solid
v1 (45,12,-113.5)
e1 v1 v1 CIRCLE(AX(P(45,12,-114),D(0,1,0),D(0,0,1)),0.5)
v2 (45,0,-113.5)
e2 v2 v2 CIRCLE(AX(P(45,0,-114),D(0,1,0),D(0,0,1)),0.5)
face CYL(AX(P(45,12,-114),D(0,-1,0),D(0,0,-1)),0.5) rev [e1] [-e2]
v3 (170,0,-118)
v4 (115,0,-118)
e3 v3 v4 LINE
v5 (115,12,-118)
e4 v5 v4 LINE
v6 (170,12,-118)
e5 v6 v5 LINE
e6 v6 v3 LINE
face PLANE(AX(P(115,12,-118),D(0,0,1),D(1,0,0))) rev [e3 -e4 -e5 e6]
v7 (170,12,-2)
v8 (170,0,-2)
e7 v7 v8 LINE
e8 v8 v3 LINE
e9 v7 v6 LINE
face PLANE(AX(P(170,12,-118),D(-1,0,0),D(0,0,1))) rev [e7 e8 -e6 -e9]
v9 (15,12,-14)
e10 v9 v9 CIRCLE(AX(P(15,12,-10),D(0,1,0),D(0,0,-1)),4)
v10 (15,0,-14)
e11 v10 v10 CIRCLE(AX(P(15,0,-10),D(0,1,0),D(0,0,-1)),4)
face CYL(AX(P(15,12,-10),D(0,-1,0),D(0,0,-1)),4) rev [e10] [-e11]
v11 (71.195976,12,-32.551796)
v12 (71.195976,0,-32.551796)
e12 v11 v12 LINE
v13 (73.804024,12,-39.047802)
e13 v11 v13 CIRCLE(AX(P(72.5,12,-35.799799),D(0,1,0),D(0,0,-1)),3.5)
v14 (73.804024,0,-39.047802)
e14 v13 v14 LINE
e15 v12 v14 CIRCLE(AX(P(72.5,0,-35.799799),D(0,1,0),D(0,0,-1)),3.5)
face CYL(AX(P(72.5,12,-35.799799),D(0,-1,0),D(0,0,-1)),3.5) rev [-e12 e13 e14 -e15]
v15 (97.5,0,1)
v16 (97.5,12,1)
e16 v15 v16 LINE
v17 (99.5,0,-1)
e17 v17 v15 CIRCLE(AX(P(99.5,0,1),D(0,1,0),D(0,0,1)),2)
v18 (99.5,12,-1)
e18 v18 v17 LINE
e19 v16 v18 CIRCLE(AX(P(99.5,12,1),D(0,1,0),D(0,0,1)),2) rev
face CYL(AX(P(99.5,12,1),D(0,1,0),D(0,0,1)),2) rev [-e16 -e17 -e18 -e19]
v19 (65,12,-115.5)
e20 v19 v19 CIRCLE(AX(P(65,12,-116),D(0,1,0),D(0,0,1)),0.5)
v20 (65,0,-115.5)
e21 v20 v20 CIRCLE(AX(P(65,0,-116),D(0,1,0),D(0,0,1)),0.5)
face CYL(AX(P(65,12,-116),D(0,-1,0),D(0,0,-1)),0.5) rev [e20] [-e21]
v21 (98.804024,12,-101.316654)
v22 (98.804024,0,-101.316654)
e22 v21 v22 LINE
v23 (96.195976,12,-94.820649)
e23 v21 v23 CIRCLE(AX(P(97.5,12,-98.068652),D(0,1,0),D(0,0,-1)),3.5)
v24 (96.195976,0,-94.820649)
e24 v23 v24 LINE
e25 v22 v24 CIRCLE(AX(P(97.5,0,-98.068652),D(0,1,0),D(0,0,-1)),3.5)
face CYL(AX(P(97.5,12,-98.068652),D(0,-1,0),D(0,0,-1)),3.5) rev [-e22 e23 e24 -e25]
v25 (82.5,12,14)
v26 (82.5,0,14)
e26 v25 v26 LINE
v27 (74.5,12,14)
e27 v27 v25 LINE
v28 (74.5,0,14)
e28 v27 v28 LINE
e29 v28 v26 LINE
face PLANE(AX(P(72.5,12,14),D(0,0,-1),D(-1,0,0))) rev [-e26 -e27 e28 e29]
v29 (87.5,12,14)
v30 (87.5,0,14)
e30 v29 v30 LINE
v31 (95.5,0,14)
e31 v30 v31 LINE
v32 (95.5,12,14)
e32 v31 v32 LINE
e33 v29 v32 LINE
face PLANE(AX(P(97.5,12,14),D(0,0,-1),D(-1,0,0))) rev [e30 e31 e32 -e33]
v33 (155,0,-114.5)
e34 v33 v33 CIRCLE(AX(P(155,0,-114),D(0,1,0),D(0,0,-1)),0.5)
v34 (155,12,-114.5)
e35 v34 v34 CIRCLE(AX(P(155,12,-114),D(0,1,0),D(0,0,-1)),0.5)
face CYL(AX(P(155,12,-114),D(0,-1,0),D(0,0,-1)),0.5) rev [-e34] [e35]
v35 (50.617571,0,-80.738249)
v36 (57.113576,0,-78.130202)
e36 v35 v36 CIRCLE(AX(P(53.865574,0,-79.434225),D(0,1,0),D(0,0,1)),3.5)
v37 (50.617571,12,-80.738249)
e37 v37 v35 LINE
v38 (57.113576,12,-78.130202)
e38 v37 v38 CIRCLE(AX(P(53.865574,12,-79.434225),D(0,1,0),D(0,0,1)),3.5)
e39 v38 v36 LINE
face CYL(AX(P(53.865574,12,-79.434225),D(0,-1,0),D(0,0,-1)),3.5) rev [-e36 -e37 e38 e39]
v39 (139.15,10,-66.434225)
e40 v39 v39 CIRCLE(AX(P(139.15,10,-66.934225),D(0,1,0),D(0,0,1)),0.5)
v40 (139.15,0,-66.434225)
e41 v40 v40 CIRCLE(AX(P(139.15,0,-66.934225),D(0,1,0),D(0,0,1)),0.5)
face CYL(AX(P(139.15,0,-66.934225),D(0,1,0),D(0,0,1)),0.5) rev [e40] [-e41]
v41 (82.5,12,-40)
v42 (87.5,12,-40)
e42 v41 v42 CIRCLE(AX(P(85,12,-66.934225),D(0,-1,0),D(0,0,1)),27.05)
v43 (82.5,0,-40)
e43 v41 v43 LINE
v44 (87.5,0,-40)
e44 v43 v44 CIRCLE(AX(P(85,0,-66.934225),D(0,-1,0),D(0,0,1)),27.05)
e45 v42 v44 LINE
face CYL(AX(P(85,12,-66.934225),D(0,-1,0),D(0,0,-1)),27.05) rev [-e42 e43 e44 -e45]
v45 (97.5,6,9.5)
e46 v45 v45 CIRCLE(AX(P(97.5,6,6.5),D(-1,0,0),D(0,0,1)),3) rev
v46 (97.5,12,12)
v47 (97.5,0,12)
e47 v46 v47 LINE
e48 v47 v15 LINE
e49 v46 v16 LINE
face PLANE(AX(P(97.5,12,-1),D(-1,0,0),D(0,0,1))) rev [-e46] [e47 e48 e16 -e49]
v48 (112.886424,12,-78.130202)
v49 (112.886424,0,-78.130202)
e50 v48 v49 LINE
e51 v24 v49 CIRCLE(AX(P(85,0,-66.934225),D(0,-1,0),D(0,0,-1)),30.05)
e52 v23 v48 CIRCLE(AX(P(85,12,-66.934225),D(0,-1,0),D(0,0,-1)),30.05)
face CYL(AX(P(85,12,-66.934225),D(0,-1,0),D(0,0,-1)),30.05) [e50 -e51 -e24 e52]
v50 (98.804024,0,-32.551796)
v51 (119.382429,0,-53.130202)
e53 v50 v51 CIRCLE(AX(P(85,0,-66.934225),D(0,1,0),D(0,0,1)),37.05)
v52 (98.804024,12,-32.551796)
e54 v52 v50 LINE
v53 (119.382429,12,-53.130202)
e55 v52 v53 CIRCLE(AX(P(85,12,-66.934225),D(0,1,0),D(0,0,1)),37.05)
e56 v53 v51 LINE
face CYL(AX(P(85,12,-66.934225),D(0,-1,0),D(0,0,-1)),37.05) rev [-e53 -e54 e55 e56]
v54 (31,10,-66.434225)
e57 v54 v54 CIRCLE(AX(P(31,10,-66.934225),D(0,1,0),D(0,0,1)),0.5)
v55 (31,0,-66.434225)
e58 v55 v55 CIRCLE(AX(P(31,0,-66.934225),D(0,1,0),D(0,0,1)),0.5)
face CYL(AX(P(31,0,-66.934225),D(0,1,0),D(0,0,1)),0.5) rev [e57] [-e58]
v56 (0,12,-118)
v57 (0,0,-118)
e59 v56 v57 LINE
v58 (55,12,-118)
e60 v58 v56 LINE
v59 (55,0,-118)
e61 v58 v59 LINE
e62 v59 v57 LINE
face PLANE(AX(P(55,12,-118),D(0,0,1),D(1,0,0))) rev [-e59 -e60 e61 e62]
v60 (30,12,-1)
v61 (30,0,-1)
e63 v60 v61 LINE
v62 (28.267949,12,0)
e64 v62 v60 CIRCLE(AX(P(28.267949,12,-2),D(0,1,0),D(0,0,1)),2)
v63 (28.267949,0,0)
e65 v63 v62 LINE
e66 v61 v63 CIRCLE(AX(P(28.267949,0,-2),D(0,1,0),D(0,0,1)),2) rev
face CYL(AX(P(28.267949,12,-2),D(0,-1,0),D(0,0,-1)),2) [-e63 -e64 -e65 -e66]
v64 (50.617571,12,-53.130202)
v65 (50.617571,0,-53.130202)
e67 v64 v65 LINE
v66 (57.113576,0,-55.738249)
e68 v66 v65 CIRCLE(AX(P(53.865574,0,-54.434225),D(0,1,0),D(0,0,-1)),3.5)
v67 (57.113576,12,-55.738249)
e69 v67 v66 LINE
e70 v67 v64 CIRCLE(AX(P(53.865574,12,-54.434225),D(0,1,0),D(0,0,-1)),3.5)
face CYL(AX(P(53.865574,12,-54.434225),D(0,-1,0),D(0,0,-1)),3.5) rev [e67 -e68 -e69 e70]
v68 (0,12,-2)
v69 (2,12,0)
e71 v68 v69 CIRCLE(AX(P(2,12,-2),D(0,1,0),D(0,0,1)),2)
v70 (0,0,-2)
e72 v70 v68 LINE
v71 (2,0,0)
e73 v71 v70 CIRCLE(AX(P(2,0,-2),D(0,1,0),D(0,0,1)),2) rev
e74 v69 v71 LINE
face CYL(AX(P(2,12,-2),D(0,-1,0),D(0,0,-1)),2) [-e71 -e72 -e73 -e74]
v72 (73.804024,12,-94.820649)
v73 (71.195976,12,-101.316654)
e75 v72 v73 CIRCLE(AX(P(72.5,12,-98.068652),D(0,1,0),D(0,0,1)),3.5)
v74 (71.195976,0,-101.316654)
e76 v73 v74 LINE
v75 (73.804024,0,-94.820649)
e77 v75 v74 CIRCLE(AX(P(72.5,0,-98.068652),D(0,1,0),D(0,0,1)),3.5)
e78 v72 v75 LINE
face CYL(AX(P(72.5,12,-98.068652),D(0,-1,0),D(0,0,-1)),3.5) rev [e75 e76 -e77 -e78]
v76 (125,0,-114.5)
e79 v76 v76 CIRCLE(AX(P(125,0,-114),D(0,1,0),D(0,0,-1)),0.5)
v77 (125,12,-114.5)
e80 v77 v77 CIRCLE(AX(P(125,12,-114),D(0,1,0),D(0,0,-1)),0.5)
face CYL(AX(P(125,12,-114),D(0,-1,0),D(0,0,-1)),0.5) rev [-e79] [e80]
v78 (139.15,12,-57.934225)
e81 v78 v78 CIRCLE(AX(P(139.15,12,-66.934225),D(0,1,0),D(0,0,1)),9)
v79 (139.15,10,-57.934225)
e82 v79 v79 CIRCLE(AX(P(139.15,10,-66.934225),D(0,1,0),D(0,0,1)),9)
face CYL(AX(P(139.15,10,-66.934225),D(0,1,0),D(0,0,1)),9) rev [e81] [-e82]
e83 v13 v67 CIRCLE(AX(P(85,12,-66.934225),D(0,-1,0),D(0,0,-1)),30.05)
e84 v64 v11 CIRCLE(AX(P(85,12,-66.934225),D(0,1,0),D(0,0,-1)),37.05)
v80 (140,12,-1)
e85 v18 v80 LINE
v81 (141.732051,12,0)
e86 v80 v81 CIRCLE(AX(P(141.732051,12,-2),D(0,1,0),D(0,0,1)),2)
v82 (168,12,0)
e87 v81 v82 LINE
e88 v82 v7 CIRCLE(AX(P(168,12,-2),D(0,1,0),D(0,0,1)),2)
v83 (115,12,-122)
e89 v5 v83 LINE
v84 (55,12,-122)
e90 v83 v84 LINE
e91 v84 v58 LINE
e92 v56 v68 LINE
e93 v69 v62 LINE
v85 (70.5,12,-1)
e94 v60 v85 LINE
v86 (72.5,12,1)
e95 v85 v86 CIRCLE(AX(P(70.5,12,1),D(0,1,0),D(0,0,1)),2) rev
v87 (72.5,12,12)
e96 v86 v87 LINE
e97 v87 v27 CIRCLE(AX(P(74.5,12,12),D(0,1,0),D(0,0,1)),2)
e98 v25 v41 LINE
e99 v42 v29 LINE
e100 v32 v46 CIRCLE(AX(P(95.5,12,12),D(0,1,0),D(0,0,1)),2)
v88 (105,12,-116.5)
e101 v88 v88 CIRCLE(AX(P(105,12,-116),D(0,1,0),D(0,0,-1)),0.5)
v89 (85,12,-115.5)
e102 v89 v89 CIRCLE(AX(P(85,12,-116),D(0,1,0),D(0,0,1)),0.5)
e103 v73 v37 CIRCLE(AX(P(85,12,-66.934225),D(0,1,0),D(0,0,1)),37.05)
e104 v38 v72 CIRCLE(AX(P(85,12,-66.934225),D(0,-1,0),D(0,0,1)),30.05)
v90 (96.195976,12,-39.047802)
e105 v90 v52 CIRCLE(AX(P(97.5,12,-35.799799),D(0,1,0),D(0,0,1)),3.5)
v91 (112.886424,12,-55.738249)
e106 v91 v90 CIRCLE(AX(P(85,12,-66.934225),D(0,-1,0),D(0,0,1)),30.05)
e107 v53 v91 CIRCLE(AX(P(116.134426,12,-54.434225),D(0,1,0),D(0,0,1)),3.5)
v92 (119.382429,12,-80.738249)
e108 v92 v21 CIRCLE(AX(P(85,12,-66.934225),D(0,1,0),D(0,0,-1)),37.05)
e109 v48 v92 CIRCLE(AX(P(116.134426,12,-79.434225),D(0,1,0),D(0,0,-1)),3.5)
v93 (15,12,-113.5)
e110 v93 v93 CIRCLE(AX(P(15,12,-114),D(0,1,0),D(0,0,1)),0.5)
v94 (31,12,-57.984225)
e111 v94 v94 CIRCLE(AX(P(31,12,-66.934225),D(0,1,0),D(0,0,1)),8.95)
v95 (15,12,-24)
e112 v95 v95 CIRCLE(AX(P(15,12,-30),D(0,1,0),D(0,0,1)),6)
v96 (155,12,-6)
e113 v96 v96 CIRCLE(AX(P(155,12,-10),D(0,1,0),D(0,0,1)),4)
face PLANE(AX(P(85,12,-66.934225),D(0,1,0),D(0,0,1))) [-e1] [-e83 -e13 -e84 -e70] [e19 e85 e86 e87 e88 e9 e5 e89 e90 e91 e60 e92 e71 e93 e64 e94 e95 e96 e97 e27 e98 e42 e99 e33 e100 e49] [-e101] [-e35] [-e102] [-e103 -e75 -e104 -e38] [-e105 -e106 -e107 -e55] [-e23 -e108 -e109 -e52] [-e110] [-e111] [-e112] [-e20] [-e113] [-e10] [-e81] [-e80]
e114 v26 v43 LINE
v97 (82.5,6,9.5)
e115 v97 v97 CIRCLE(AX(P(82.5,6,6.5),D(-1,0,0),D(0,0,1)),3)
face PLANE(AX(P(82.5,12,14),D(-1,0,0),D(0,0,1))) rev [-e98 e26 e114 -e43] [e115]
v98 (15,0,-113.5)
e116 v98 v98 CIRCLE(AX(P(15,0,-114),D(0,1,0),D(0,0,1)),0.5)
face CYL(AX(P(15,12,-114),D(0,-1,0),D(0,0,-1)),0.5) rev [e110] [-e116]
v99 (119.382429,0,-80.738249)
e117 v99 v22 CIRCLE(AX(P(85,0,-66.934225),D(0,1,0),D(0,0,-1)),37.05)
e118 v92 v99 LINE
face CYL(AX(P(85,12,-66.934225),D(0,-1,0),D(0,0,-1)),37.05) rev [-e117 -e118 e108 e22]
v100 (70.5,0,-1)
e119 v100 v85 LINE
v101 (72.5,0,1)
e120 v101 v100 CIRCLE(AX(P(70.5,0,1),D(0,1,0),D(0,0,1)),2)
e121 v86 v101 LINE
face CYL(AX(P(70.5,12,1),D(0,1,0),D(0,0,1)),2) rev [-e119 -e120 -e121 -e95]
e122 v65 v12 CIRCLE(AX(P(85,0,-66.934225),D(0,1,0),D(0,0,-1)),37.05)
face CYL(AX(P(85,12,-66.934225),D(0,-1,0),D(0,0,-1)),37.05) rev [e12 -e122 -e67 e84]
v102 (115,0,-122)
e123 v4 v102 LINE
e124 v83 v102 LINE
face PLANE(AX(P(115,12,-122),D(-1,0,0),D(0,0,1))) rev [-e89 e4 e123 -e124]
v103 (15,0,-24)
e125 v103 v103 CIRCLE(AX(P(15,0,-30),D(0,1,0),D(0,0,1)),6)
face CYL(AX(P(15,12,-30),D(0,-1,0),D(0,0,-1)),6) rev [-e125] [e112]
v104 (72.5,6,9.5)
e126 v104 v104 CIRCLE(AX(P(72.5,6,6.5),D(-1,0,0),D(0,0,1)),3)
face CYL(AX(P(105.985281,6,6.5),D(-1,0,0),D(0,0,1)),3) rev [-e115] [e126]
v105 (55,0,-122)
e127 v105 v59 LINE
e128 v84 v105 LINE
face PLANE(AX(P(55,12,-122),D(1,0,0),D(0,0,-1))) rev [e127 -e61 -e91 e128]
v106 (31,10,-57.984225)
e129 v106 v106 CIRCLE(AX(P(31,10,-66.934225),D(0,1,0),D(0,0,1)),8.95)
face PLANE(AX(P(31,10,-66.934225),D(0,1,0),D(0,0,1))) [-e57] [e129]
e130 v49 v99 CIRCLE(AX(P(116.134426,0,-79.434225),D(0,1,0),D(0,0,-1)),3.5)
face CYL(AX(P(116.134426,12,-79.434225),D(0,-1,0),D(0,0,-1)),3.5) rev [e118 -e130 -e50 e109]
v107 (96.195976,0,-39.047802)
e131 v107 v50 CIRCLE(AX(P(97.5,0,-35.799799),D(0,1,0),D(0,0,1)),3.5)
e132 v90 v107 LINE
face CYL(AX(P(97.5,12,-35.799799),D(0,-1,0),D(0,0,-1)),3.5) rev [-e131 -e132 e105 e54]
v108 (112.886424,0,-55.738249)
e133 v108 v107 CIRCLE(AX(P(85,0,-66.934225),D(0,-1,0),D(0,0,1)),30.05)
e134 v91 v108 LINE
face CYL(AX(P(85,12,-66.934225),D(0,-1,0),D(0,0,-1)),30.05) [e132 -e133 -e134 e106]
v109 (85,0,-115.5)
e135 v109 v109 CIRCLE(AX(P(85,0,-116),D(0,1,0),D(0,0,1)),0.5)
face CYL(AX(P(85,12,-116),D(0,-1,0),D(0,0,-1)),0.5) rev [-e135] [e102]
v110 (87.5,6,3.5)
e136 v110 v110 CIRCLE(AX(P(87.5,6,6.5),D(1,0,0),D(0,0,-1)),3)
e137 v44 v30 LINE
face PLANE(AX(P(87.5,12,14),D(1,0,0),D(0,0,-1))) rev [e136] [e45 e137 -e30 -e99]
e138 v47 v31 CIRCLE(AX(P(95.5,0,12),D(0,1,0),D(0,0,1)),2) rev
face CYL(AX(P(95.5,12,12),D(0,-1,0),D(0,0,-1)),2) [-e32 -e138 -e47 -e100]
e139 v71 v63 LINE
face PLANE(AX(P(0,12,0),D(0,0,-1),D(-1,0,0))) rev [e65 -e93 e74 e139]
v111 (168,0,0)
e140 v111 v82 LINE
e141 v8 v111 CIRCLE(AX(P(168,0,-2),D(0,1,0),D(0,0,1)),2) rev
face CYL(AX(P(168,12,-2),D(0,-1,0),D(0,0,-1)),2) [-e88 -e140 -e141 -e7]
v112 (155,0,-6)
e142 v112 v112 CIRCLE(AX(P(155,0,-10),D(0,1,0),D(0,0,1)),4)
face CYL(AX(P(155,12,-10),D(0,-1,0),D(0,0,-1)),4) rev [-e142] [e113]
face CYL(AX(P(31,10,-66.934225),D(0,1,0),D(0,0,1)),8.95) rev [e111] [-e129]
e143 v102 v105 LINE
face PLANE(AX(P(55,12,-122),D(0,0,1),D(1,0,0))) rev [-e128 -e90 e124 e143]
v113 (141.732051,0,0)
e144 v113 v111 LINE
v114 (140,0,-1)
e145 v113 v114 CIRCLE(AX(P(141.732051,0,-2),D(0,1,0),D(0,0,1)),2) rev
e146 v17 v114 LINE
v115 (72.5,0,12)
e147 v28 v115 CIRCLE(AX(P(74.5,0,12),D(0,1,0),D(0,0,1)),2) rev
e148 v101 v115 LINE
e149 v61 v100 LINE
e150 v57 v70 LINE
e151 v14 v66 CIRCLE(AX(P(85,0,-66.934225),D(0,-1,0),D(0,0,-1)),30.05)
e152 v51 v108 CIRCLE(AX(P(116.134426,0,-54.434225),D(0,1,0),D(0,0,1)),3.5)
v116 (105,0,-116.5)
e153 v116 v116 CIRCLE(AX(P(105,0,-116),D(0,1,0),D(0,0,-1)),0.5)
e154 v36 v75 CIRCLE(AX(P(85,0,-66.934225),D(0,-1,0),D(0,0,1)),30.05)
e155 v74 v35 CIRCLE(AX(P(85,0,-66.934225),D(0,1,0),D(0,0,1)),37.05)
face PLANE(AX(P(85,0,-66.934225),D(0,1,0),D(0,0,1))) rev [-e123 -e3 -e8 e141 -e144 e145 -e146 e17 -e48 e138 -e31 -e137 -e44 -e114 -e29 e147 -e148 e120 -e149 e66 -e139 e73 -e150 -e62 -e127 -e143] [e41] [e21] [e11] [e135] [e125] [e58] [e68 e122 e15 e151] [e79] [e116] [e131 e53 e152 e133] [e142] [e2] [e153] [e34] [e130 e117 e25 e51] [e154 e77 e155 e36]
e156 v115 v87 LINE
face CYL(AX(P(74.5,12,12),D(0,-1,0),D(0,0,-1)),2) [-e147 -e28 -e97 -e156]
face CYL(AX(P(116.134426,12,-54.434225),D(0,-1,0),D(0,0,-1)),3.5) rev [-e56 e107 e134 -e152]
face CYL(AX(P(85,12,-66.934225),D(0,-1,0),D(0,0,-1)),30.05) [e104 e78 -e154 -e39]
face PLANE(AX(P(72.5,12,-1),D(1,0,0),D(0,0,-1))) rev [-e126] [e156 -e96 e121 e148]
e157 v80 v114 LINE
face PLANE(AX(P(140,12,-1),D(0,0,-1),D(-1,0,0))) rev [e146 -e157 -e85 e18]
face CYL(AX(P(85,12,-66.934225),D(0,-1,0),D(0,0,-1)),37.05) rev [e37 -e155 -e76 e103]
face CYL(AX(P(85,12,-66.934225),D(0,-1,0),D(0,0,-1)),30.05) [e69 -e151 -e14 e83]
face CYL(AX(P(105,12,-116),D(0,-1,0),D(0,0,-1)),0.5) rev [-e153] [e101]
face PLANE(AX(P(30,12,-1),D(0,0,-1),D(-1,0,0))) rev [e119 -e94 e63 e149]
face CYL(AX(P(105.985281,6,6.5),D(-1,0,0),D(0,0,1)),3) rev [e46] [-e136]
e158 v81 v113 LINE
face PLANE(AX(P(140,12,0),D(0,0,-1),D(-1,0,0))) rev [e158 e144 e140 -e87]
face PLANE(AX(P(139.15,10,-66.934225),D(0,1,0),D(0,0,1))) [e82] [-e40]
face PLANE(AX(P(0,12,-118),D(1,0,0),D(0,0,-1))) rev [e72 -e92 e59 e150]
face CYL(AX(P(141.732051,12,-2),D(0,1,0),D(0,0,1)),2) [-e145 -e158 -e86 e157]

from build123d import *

# Parameters (mm, degrees)
SKETCH1_R           = 0.5
SKETCH1_R_2         = 6
SKETCH1_R_3         = 4
BOSS_EXTRUDE1_DEPTH = 12
SKETCH2_R           = 8.95
SKETCH2_R_2         = 9
CUT_EXTRUDE1_DEPTH  = 2
SKETCH3_R           = 0.5
CUT_EXTRUDE2_DEPTH  = 210.485083001
SKETCH4_R           = 3
CUT_EXTRUDE3_DEPTH  = 25
FILLET1_R           = 2


with BuildPart() as part:
    # Sketch1 → Boss-Extrude1 (new body)
    with BuildSketch(Plane(origin=(0, 0, 0), x_dir=(1, 0, 0), z_dir=(0, 1, 0))):
        with BuildLine():
            Line((55, 122), (55, 118))
            Line((55, 118), (0, 118))
            Line((0, 118), (0, 0))
            Line((0, 0), (30, 0))
            Line((30, 0), (30, 1))
            Line((30, 1), (72.5, 1))
            Line((72.5, 1), (72.5, -14))
            Line((72.5, -14), (82.5, -14))
            Line((82.5, -14), (82.5, 40))
            ThreePointArc((82.5, 40), (85, 93.984225439), (87.5, 40))
            Line((87.5, 40), (87.5, -14))
            Line((87.5, -14), (97.5, -14))
            Line((97.5, -14), (97.5, 1))
            Line((97.5, 1), (140, 1))
            Line((140, 1), (140, 0))
            Line((140, 0), (170, 0))
            Line((170, 0), (170, 118))
            Line((170, 118), (115, 118))
            Line((115, 118), (115, 122))
            Line((115, 122), (55, 122))
        make_face()
        with Locations(Location((65, 116, 0), (0, 0, 270))):
            Circle(SKETCH1_R, mode=Mode.SUBTRACT)
        with Locations(Location((105, 116, 0), (0, 0, 90))):
            Circle(SKETCH1_R, mode=Mode.SUBTRACT)
        with Locations(Location((45, 114, 0), (0, 0, 270))):
            Circle(SKETCH1_R, mode=Mode.SUBTRACT)
        with Locations(Location((15, 114, 0), (0, 0, 270))):
            Circle(SKETCH1_R, mode=Mode.SUBTRACT)
        with Locations(Location((155, 114, 0), (0, 0, 90))):
            Circle(SKETCH1_R, mode=Mode.SUBTRACT)
        with Locations(Location((125, 114, 0), (0, 0, 90))):
            Circle(SKETCH1_R, mode=Mode.SUBTRACT)
        with Locations(Location((15, 30, 0), (0, 0, 270))):
            Circle(SKETCH1_R_2, mode=Mode.SUBTRACT)
        with Locations(Location((155, 10, 0), (0, 0, 270))):
            Circle(SKETCH1_R_3, mode=Mode.SUBTRACT)
        with Locations(Location((15, 10, 0), (0, 0, 90))):
            Circle(SKETCH1_R_3, mode=Mode.SUBTRACT)
        with Locations(Location((85, 116, 0), (0, 0, 270))):
            Circle(SKETCH1_R, mode=Mode.SUBTRACT)
        with BuildLine():
            ThreePointArc((71.195976155, 101.316654464), (58.801693757, 93.132531682), (50.617570975, 80.738249284))
            ThreePointArc((50.617570975, 80.738249284), (52.561549872, 76.186222697), (57.113576458, 78.130201594))
            ThreePointArc((57.113576458, 78.130201594), (63.751441225, 88.182784214), (73.804023845, 94.820648981))
            ThreePointArc((73.804023845, 94.820648981), (75.748002742, 99.372675567), (71.195976155, 101.316654464))
        make_face(mode=Mode.SUBTRACT)
        with BuildLine():
            ThreePointArc((98.804023845, 101.316654464), (111.198306243, 93.132531682), (119.382429025, 80.738249284))
            ThreePointArc((119.382429025, 80.738249284), (117.438450128, 76.186222697), (112.886423542, 78.130201594))
            ThreePointArc((112.886423542, 78.130201594), (106.248558775, 88.182784214), (96.195976155, 94.820648981))
            ThreePointArc((96.195976155, 94.820648981), (94.251997258, 99.372675567), (98.804023845, 101.316654464))
        make_face(mode=Mode.SUBTRACT)
        with BuildLine():
            ThreePointArc((71.195976155, 32.551796414), (58.801693757, 40.735919196), (50.617570975, 53.130201594))
            ThreePointArc((50.617570975, 53.130201594), (52.561549872, 57.682228181), (57.113576458, 55.738249284))
            ThreePointArc((57.113576458, 55.738249284), (63.751441225, 45.685666664), (73.804023845, 39.047801898))
            ThreePointArc((73.804023845, 39.047801898), (75.748002742, 34.495775311), (71.195976155, 32.551796414))
        make_face(mode=Mode.SUBTRACT)
        with BuildLine():
            ThreePointArc((98.804023845, 32.551796414), (111.198306243, 40.735919196), (119.382429025, 53.130201594))
            ThreePointArc((119.382429025, 53.130201594), (117.438450128, 57.682228181), (112.886423542, 55.738249284))
            ThreePointArc((112.886423542, 55.738249284), (106.248558775, 45.685666664), (96.195976155, 39.047801898))
            ThreePointArc((96.195976155, 39.047801898), (94.251997258, 34.495775311), (98.804023845, 32.551796414))
        make_face(mode=Mode.SUBTRACT)
    extrude(amount=BOSS_EXTRUDE1_DEPTH)

    # Sketch2 → Cut-Extrude1 (cut)
    with BuildSketch(Plane(origin=(0, 12, 0), x_dir=(1, 0, 0), z_dir=(0, 1, 0))):
        with Locations(Location((31, 66.934225439, 0), (0, 0, 270))):
            Circle(SKETCH2_R)
        with Locations(Location((139.15, 66.934225439, 0), (0, 0, 270))):
            Circle(SKETCH2_R_2)
    extrude(amount=-CUT_EXTRUDE1_DEPTH, mode=Mode.SUBTRACT)

    # Sketch3 → Cut-Extrude2 (cut, through all)
    with BuildSketch(Plane(origin=(0, 10, 0), x_dir=(1, 0, 0), z_dir=(0, 1, 0))):
        with Locations(Location((31, 66.934225439, 0), (0, 0, 270))):
            Circle(SKETCH3_R)
        with Locations(Location((139.15, 66.934225439, 0), (0, 0, 270))):
            Circle(SKETCH3_R)
    extrude(amount=-CUT_EXTRUDE2_DEPTH, mode=Mode.SUBTRACT)

    # Sketch4 → Cut-Extrude3 (cut)
    with BuildSketch(Plane.ZY.offset(-72.5)):
        with Locations((6.5, 6)):
            Circle(SKETCH4_R)
    extrude(amount=-CUT_EXTRUDE3_DEPTH, mode=Mode.SUBTRACT)

    # Fillet1
    # the kernel refuses this fillet: 2 mm, written as the material it adds along each edge
    with BuildSketch(Plane(origin=(72.5, 0, -1), x_dir=(-1, 0, 0), z_dir=(0, 1, 0))) as fillet1_piece_1:
        with BuildLine():
            CenterArc((FILLET1_R, FILLET1_R), FILLET1_R, 180, 90)
            Line((0, FILLET1_R), (0, 0))
            Line((0, 0), (FILLET1_R, 0))
        make_face()
    extrude(amount=12)
    with BuildSketch(Plane(origin=(97.5, 0, -1), x_dir=(1, 0, 0), z_dir=(0, 1, 0))) as fillet1_piece_2:
        with BuildLine():
            CenterArc((FILLET1_R, -FILLET1_R), FILLET1_R, 90, 90)
            Line((0, -FILLET1_R), (0, 0))
            Line((0, 0), (FILLET1_R, 0))
        make_face()
    extrude(amount=12)
    # the kernel refuses this fillet: 2 mm, written as the material it takes off along each edge
    with BuildSketch(Plane(origin=(170, -5, 0), x_dir=(0, 0, -1), z_dir=(0, 1, 0)), Plane(origin=(97.5, -5, 14), x_dir=(0, 0, -1), z_dir=(0, 1, 0))) as fillet1_2_piece_1:
        with BuildLine():
            CenterArc((FILLET1_R, FILLET1_R), FILLET1_R, 180, 90)
            Line((0, FILLET1_R), (0, 0))
            Line((0, 0), (FILLET1_R, 0))
        make_face()
    extrude(amount=22, mode=Mode.SUBTRACT)
    with BuildSketch(Plane(origin=(140, -4.330127019, 0), x_dir=(1, 0, 0), z_dir=(0, 1, 0))) as fillet1_2_piece_2:
        with BuildLine():
            CenterArc((1.732050808, 2), FILLET1_R, 210, 60)
            Line((0, 1), (0, 0))
            Line((0, 0), (1.732050808, 0))
        make_face()
    extrude(amount=20.660254038, mode=Mode.SUBTRACT)
    with BuildSketch(Plane(origin=(72.5, -5, 14), x_dir=(0, 0, -1), z_dir=(0, 1, 0)), Plane(origin=(0, -5, 0), x_dir=(0, 0, -1), z_dir=(0, 1, 0))) as fillet1_2_piece_3:
        with BuildLine():
            CenterArc((FILLET1_R, -FILLET1_R), FILLET1_R, 90, 90)
            Line((0, -FILLET1_R), (0, 0))
            Line((0, 0), (FILLET1_R, 0))
        make_face()
    extrude(amount=22, mode=Mode.SUBTRACT)
    with BuildSketch(Plane(origin=(30, -4.330127019, 0), x_dir=(-1, 0, 0), z_dir=(0, 1, 0))) as fillet1_2_piece_4:
        with BuildLine():
            CenterArc((1.732050808, -2), FILLET1_R, 90, 60)
            Line((0, -1), (0, 0))
            Line((0, 0), (1.732050808, 0))
        make_face()
    extrude(amount=20.660254038, mode=Mode.SUBTRACT)


solid = part.part
